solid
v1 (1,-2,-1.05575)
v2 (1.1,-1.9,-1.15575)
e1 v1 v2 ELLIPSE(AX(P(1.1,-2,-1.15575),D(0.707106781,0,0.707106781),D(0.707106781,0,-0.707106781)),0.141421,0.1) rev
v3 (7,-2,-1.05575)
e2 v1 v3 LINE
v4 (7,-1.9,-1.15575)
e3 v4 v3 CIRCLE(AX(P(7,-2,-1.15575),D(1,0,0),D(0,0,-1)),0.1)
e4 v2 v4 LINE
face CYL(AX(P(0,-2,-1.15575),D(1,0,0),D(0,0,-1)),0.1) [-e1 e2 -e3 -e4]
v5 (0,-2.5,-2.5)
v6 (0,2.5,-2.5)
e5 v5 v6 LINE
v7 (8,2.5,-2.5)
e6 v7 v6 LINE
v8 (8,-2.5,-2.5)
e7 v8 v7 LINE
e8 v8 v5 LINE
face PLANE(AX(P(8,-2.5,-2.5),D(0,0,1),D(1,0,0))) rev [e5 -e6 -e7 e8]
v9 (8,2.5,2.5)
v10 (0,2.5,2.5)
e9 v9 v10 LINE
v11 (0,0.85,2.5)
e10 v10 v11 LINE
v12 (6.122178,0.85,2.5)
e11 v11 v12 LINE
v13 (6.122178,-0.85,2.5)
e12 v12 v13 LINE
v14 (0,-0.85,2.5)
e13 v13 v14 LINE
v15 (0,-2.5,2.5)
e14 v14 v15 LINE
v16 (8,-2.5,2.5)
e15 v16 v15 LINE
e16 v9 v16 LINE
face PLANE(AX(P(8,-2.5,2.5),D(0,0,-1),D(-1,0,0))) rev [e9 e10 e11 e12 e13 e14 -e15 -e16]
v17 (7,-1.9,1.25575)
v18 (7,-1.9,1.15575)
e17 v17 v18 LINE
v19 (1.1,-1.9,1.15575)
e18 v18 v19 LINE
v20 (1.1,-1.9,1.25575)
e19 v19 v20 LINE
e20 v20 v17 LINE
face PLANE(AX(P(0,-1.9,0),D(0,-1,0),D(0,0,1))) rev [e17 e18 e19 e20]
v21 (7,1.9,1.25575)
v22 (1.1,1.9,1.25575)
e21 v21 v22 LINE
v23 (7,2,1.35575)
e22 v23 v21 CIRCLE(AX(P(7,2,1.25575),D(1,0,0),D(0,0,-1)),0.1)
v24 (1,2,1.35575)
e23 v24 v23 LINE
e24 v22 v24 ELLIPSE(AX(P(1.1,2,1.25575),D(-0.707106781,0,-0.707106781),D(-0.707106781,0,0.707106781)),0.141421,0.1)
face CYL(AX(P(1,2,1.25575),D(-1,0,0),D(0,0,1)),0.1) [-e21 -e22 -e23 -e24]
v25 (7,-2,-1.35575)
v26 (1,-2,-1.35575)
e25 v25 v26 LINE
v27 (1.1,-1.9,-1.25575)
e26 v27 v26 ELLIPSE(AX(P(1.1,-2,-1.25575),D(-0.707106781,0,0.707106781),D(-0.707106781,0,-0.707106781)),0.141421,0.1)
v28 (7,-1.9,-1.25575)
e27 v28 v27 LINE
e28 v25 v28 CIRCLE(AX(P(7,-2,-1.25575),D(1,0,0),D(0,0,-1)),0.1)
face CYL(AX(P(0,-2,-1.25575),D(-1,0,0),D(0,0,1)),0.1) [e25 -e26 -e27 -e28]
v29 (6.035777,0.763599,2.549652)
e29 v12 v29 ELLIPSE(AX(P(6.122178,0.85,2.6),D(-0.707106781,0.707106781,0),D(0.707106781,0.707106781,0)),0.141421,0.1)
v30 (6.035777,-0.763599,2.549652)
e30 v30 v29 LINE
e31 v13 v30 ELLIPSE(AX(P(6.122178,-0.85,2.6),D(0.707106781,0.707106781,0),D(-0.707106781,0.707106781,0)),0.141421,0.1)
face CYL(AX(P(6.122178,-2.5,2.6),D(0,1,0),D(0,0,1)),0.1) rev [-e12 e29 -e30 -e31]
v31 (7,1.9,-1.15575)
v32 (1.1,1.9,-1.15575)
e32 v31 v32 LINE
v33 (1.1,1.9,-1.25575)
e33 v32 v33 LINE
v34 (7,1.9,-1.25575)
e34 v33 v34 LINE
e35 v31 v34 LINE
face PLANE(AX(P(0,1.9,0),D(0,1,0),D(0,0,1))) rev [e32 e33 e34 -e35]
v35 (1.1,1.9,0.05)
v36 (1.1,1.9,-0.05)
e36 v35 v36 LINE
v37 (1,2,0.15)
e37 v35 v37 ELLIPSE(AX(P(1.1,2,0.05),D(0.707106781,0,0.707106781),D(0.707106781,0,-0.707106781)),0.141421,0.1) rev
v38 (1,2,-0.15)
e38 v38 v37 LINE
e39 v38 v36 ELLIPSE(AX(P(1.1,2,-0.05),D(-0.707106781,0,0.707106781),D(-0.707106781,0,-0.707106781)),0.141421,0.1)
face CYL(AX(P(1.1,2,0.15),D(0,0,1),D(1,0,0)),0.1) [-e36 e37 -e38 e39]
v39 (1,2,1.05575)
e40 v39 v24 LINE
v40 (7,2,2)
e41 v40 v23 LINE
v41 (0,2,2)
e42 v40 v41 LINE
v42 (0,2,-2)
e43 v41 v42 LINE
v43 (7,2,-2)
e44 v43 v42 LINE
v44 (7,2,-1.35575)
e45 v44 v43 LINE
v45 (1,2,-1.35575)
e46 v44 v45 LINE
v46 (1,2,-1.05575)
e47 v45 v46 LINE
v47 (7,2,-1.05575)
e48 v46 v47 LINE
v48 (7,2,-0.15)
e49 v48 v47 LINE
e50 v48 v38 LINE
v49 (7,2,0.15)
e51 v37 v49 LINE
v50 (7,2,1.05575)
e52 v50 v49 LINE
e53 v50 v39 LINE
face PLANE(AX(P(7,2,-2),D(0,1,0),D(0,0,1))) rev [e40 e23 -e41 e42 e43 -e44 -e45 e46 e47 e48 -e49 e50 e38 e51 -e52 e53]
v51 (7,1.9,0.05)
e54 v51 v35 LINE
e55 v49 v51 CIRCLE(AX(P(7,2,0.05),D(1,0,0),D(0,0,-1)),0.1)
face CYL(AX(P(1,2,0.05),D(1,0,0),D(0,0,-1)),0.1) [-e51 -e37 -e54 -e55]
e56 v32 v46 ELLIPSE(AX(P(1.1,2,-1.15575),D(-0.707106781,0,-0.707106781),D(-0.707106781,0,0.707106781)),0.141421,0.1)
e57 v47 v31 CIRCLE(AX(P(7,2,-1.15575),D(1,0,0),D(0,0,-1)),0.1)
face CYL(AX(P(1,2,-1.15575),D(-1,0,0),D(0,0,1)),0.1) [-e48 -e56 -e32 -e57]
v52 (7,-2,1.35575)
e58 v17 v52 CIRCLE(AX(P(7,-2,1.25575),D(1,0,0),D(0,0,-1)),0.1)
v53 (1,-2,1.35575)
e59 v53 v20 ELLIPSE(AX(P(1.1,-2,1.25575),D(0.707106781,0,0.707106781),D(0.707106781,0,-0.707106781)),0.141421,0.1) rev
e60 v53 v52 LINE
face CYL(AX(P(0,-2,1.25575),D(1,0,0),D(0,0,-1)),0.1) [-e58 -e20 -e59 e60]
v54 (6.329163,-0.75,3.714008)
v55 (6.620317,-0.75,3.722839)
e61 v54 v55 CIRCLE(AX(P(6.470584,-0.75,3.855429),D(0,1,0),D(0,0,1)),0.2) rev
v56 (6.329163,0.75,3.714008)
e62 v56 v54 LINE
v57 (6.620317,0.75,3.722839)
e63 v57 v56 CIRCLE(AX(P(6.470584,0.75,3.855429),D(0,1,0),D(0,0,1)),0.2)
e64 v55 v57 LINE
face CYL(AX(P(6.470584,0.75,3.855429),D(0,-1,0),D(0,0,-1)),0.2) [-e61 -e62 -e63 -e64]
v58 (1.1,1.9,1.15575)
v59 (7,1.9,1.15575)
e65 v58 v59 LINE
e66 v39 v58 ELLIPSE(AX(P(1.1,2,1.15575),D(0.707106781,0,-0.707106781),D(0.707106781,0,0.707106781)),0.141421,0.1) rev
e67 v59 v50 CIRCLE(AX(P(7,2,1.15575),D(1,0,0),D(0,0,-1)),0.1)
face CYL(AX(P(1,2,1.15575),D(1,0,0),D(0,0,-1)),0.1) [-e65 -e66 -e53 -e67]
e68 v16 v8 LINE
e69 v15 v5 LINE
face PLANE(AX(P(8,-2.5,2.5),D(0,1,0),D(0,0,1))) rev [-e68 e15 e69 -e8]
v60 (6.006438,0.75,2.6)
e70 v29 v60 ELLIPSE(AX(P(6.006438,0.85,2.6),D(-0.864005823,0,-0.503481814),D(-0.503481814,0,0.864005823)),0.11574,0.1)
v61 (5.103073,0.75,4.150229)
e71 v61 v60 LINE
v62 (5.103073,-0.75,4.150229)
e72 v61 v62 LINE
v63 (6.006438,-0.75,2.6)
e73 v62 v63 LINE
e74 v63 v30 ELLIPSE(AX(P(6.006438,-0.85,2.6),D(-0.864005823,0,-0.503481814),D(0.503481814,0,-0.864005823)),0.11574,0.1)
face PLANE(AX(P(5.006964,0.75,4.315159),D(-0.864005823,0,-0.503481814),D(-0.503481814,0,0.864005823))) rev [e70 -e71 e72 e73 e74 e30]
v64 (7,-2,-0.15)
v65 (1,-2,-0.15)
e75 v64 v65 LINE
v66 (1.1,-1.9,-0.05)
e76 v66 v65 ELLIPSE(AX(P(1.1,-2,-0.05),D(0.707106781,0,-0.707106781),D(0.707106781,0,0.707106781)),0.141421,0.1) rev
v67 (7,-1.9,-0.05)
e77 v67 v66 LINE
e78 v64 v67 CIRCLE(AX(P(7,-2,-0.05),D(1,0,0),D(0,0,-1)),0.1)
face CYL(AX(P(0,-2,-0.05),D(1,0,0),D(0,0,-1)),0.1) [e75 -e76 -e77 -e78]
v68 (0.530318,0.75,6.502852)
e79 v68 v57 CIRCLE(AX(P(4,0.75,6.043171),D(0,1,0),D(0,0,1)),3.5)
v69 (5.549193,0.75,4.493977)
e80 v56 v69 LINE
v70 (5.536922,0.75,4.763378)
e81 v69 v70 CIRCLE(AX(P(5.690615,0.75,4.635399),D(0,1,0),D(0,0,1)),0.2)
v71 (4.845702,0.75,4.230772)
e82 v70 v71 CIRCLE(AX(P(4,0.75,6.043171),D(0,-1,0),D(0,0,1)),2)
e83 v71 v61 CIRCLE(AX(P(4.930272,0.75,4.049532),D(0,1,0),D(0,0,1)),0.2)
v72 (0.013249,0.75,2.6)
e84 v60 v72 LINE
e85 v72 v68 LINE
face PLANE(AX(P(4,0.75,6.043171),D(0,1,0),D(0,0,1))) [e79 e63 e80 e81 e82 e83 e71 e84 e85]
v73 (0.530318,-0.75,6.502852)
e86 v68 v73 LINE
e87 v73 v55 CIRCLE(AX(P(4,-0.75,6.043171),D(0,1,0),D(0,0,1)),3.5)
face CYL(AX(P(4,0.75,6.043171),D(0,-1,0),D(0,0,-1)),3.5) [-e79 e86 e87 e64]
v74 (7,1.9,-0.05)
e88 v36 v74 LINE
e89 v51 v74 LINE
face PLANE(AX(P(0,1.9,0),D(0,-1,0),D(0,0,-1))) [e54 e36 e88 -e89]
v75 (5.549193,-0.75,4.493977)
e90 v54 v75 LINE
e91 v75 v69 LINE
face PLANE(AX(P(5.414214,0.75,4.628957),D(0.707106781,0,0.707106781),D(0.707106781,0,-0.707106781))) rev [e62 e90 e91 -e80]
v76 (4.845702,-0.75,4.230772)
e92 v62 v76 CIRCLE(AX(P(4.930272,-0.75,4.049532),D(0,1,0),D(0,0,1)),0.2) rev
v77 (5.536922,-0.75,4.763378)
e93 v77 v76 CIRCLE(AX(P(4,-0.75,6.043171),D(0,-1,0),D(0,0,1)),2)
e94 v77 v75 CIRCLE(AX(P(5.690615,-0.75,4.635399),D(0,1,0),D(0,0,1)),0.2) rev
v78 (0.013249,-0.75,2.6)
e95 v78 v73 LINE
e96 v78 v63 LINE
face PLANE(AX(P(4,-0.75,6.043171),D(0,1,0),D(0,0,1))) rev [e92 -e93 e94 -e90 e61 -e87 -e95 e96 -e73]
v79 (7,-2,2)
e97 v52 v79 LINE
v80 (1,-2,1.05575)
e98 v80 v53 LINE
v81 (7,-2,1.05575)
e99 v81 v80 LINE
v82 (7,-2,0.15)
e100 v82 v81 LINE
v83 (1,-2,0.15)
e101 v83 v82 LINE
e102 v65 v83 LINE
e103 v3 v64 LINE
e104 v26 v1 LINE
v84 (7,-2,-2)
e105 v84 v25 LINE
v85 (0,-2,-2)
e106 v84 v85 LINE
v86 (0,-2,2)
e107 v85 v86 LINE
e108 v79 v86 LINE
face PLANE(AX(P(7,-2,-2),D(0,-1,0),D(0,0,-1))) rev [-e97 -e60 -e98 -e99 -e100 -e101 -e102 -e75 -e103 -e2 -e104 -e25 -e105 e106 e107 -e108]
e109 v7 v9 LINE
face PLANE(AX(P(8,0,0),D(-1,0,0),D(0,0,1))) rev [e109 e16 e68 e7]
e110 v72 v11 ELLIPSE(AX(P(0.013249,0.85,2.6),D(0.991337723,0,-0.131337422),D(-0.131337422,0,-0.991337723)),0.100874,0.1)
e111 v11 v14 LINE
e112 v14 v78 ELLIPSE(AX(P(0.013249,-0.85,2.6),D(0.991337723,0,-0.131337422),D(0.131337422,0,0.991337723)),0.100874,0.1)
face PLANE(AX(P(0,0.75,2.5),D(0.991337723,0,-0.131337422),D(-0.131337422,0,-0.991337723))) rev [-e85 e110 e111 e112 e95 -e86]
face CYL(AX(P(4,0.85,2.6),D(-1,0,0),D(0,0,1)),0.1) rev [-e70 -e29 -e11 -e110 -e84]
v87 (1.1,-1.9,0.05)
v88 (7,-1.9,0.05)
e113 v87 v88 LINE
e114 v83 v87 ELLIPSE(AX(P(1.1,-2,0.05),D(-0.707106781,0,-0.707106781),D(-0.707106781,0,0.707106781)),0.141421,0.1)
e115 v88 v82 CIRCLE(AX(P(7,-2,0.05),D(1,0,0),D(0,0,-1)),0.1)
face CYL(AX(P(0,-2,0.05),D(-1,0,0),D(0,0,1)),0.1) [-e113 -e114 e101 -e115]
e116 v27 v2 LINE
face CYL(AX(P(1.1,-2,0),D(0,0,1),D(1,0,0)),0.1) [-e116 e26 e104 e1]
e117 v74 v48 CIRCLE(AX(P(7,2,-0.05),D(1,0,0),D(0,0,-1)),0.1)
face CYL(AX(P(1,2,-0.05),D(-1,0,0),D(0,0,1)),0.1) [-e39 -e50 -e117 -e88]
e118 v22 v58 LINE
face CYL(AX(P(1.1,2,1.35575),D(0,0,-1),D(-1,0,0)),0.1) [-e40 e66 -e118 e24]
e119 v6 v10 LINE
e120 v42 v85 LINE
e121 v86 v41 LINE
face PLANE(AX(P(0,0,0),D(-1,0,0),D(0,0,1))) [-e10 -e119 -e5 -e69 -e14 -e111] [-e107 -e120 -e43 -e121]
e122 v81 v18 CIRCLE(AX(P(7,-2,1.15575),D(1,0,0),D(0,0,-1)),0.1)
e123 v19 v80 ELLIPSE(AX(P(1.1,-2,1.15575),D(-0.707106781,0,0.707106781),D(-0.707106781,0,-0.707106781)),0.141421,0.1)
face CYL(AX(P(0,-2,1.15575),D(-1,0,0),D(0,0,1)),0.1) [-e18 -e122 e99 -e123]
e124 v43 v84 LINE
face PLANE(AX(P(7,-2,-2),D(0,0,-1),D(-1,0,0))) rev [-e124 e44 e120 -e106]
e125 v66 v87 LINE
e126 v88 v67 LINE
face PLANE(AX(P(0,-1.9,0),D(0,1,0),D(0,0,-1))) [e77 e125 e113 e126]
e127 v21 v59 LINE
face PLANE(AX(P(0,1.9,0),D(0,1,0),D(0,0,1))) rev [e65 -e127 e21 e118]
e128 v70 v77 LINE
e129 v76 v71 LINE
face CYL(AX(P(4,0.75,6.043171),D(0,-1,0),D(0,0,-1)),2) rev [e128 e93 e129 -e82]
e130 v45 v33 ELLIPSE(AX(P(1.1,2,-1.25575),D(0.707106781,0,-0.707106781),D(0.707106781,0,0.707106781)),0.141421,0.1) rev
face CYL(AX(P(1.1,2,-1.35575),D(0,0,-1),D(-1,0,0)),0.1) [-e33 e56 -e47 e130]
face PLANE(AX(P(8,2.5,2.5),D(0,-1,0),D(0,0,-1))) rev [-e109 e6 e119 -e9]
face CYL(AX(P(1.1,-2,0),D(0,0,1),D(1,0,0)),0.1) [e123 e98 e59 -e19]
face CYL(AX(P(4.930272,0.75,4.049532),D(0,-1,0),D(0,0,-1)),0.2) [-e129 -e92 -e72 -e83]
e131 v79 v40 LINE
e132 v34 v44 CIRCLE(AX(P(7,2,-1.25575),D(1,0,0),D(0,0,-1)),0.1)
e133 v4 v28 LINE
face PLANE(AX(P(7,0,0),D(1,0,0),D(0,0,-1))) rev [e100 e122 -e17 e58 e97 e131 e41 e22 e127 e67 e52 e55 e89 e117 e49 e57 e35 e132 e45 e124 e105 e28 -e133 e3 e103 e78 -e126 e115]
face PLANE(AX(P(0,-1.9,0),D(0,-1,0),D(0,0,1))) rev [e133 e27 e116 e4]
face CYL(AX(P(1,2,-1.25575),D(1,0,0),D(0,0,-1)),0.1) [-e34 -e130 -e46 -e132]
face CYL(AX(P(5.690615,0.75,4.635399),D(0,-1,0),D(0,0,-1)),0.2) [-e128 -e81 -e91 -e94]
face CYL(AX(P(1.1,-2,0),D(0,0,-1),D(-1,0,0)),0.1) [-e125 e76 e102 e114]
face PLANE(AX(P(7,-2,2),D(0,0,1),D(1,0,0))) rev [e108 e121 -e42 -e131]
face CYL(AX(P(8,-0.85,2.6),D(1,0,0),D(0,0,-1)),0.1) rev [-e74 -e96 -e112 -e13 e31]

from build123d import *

# Parameters (mm, degrees)
SKETCH_1_W             = 5
SKETCH_1_H             = 5
EXTRUDE_1_DEPTH        = 8
EXTRUDE_3_DEPTH        = 0.75
FILLET_2_R             = 0.2
FILLET_3_R             = 0.2
SKETCH_5_W             = 4
SKETCH_5_H             = 4
CUT_EXTRUDE_1_DEPTH    = 7
SKETCH_6_W             = 6
SKETCH_6_H             = 0.3
EXTRUDE_4_DEPTH        = 0.6
FILLET_4_R             = 0.1
FILLET_4_OF_MIRROR_1_R = 0.1
FILLET_5_R             = 0.1


# Some blends are built 0.0001 mm under size
with BuildPart() as part:
    # 草图1 → 凸台-拉伸1 (new body)
    with BuildSketch(Plane(origin=(0, 0, 0), x_dir=(0, 0, -1), z_dir=(1, 0, 0))):
        Rectangle(SKETCH_1_W, SKETCH_1_H)
    extrude(amount=EXTRUDE_1_DEPTH)

    # 草图4 → 凸台-拉伸3 (add, symmetric)
    with BuildSketch(Plane(origin=(0, 0, 0), x_dir=(1, 0, 0), z_dir=(0, 1, 0))):
        with BuildLine():
            Line((0, -2.5), (0.530317969, -6.502851582))
            ThreePointArc((0.530317969, -6.502851582), (5.54929459, -9.181591589), (6.474873734, -3.56829687))
            Line((6.474873734, -3.56829687), (5.414213562, -4.628957042))
            ThreePointArc((5.414213562, -4.628957042), (2.779286251, -7.627423723), (5.006963629, -4.315158958))
            Line((5.006963629, -4.315158958), (6.064710581, -2.5))
            Line((6.064710581, -2.5), (0, -2.5))
        make_face()
    extrude(amount=EXTRUDE_3_DEPTH, both=True)

    # 圆角2
    fillet_2_edges = [part.edges().sort_by_distance(p)[0] for p in [
        (5.414213562, 0, 4.628957042),
        (6.474873734, 0, 3.56829687),
    ]]
    fillet(fillet_2_edges, radius=FILLET_2_R)

    # 圆角3
    fillet_3_edges = [part.edges().sort_by_distance(p)[0] for p in [
        (5.006963629, 0, 4.315158958),
    ]]
    fillet(fillet_3_edges, radius=FILLET_3_R)

    # 草图5 → 切除-拉伸1 (cut)
    with BuildSketch(Plane.ZY):
        Rectangle(SKETCH_5_W, SKETCH_5_H)
    extrude(amount=-CUT_EXTRUDE_1_DEPTH, mode=Mode.SUBTRACT)

    # 草图6 → 凸台-拉伸4 (add)
    with BuildSketch(Plane(origin=(0, 2.5, 0), x_dir=(1, 0, 0), z_dir=(0, 1, 0))):
        with Locations((4, 0)):
            Rectangle(SKETCH_6_W, SKETCH_6_H)
        with Locations((4, 1.205749971)):
            Rectangle(SKETCH_6_W, SKETCH_6_H)
        with Locations((4, -1.205749971)):
            Rectangle(SKETCH_6_W, SKETCH_6_H)
    extrude_4 = extrude(amount=-EXTRUDE_4_DEPTH)

    # 圆角4
    fillet_4_edges = [part.edges().sort_by_distance(p)[0] for p in [
        (1, 1.9, 1.205749971),
        (4, 1.9, 1.355749971),
        (4, 1.9, 1.055749971),
        (1, 1.9, 0),
        (4, 1.9, 0.15),
        (4, 1.9, -0.15),
        (1, 1.9, -1.205749971),
        (4, 1.9, -1.055749971),
        (4, 1.9, -1.355749971),
    ]]
    fillet(fillet_4_edges, radius=FILLET_4_R - 0.0001)  # a hair under: the kernel refuses the full size

    # 镜向1: 凸台-拉伸4 across plane
    add(extrude_4.mirror(Plane.ZX))

    # 圆角4 of 镜向1
    fillet_4_of_mirror_1_edges = [part.edges().sort_by_distance(p)[0] for p in [
        (1, -1.9, 1.205749971),
        (4, -1.9, 1.355749971),
        (4, -1.9, 1.055749971),
        (1, -1.9, 0),
        (4, -1.9, 0.15),
        (4, -1.9, -0.15),
        (1, -1.9, -1.205749971),
        (4, -1.9, -1.055749971),
        (4, -1.9, -1.355749971),
    ]]
    fillet(fillet_4_of_mirror_1_edges, radius=FILLET_4_OF_MIRROR_1_R - 0.0001)  # a hair under: the kernel refuses the full size

    # 圆角5
    # the kernel refuses this fillet: 0.1 mm, written as the material it adds along each edge
    with BuildSketch(Plane(origin=(6.314710581, -0.75, 2.5), x_dir=(0, -1, 0), z_dir=(-1, 0, 0))) as fillet_5_piece_1_section:
        with BuildLine():
            CenterArc((FILLET_5_R, FILLET_5_R), FILLET_5_R, 180, 90)
            Line((0, FILLET_5_R), (0, 0))
            Line((0, 0), (FILLET_5_R, 0))
        make_face()
    fillet_5_piece_1 = extrude(amount=6.314710581, mode=Mode.PRIVATE)
    fillet_5_piece_1 = split(fillet_5_piece_1, bisect_by=Plane(origin=(0.055159567, -0.772671932, 2.916345616), z_dir=(0.9913377232664815, 0, -0.1313374220427252)), keep=Keep.TOP, mode=Mode.PRIVATE)
    fillet_5_piece_1 = split(fillet_5_piece_1, bisect_by=Plane(origin=(5.284914857, -0.772671932, 3.83817752), z_dir=(-0.8640058232036738, 0, -0.5034818144383589)), keep=Keep.TOP, mode=Mode.PRIVATE)
    add(fillet_5_piece_1)
    with BuildSketch(Plane(origin=(6.064710581, 0.75, 2.5), x_dir=(1, 0, 0), z_dir=(0, -1, 0))) as fillet_5_piece_2:
        with BuildLine():
            CenterArc((FILLET_5_R * 0.57466995271, FILLET_5_R), FILLET_5_R, 210.230623586, 59.769376414)
            Line((-FILLET_5_R * 0.289335870494, FILLET_5_R * 0.496518185562), (0, 0))
            Line((0, 0), (FILLET_5_R * 0.57466995271, 0))
        make_face()
    extrude(amount=1.5)
    with BuildSketch(Plane(origin=(6.314710581, 0.75, 2.5), x_dir=(0, 1, 0), z_dir=(-1, 0, 0))) as fillet_5_piece_3_section:
        with BuildLine():
            CenterArc((FILLET_5_R, -FILLET_5_R), FILLET_5_R, 90, 90)
            Line((0, -FILLET_5_R), (0, 0))
            Line((0, 0), (FILLET_5_R, 0))
        make_face()
    fillet_5_piece_3 = extrude(amount=6.314710581, mode=Mode.PRIVATE)
    fillet_5_piece_3 = split(fillet_5_piece_3, bisect_by=Plane(origin=(0.055159567, 0.772671932, 2.916345616), z_dir=(0.9913377232664815, 0, -0.1313374220427252)), keep=Keep.TOP, mode=Mode.PRIVATE)
    fillet_5_piece_3 = split(fillet_5_piece_3, bisect_by=Plane(origin=(5.284914857, 0.772671932, 3.83817752), z_dir=(-0.8640058232036738, 0, -0.5034818144383589)), keep=Keep.TOP, mode=Mode.PRIVATE)
    add(fillet_5_piece_3)
    with BuildSketch(Plane(origin=(6.064710581, 0.75, 2.5), x_dir=(1, 0, 0), z_dir=(0, -1, 0))) as fillet_5_piece_4a_section:
        with BuildLine():
            CenterArc((FILLET_5_R * 0.57466995271, FILLET_5_R), FILLET_5_R, 210.230623586, 59.769376414)
            Line((-FILLET_5_R * 0.289335870494, FILLET_5_R * 0.496518185562), (0, 0))
            Line((0, 0), (FILLET_5_R * 0.57466995271, 0))
        make_face()
    fillet_5_piece_4a = extrude(amount=1.643667488, mode=Mode.PRIVATE)
    fillet_5_piece_4a = split(fillet_5_piece_4a, bisect_by=Plane(origin=(6.070891015, -0.75, 2.510754755), z_dir=(0, -1, 0)), keep=Keep.TOP, mode=Mode.PRIVATE)
    with BuildSketch(Plane(origin=(6.314710581, -0.75, 2.5), x_dir=(0, -1, 0), z_dir=(-1, 0, 0))) as fillet_5_piece_4b_section:
        with BuildLine():
            CenterArc((FILLET_5_R, FILLET_5_R), FILLET_5_R, 180, 90)
            Line((0, FILLET_5_R), (0, 0))
            Line((0, 0), (FILLET_5_R, 0))
        make_face()
    fillet_5_piece_4b = extrude(amount=6.314710581, mode=Mode.PRIVATE)
    fillet_5_piece_4b = split(fillet_5_piece_4b, bisect_by=Plane(origin=(6.084353102, -0.772031599, 2.466292222), z_dir=(0.8640058232036738, 0, 0.5034818144383589)), keep=Keep.TOP, mode=Mode.PRIVATE)
    fillet_5_piece_4 = fillet_5_piece_4a & fillet_5_piece_4b
    add(fillet_5_piece_4)
    with BuildSketch(Plane(origin=(6.314710581, 0.75, 2.5), x_dir=(0, 1, 0), z_dir=(-1, 0, 0))) as fillet_5_piece_5a_section:
        with BuildLine():
            CenterArc((FILLET_5_R, -FILLET_5_R), FILLET_5_R, 90, 90)
            Line((0, -FILLET_5_R), (0, 0))
            Line((0, 0), (FILLET_5_R, 0))
        make_face()
    fillet_5_piece_5a = extrude(amount=6.314710581, mode=Mode.PRIVATE)
    fillet_5_piece_5a = split(fillet_5_piece_5a, bisect_by=Plane(origin=(6.084353102, 0.772031599, 2.466292222), z_dir=(0.8640058232036738, 0, 0.5034818144383589)), keep=Keep.TOP, mode=Mode.PRIVATE)
    with BuildSketch(Plane(origin=(6.064710581, 0.893667488, 2.5), x_dir=(1, 0, 0), z_dir=(0, -1, 0))) as fillet_5_piece_5b_section:
        with BuildLine():
            CenterArc((FILLET_5_R * 0.57466995271, FILLET_5_R), FILLET_5_R, 210.230623586, 59.769376414)
            Line((-FILLET_5_R * 0.289335870494, FILLET_5_R * 0.496518185562), (0, 0))
            Line((0, 0), (FILLET_5_R * 0.57466995271, 0))
        make_face()
    fillet_5_piece_5b = extrude(amount=1.643667488, mode=Mode.PRIVATE)
    fillet_5_piece_5b = split(fillet_5_piece_5b, bisect_by=Plane(origin=(6.070891015, 0.75, 2.510754755), z_dir=(0, 1, 0)), keep=Keep.TOP, mode=Mode.PRIVATE)
    fillet_5_piece_5 = fillet_5_piece_5a & fillet_5_piece_5b
    add(fillet_5_piece_5)


solid = part.part
